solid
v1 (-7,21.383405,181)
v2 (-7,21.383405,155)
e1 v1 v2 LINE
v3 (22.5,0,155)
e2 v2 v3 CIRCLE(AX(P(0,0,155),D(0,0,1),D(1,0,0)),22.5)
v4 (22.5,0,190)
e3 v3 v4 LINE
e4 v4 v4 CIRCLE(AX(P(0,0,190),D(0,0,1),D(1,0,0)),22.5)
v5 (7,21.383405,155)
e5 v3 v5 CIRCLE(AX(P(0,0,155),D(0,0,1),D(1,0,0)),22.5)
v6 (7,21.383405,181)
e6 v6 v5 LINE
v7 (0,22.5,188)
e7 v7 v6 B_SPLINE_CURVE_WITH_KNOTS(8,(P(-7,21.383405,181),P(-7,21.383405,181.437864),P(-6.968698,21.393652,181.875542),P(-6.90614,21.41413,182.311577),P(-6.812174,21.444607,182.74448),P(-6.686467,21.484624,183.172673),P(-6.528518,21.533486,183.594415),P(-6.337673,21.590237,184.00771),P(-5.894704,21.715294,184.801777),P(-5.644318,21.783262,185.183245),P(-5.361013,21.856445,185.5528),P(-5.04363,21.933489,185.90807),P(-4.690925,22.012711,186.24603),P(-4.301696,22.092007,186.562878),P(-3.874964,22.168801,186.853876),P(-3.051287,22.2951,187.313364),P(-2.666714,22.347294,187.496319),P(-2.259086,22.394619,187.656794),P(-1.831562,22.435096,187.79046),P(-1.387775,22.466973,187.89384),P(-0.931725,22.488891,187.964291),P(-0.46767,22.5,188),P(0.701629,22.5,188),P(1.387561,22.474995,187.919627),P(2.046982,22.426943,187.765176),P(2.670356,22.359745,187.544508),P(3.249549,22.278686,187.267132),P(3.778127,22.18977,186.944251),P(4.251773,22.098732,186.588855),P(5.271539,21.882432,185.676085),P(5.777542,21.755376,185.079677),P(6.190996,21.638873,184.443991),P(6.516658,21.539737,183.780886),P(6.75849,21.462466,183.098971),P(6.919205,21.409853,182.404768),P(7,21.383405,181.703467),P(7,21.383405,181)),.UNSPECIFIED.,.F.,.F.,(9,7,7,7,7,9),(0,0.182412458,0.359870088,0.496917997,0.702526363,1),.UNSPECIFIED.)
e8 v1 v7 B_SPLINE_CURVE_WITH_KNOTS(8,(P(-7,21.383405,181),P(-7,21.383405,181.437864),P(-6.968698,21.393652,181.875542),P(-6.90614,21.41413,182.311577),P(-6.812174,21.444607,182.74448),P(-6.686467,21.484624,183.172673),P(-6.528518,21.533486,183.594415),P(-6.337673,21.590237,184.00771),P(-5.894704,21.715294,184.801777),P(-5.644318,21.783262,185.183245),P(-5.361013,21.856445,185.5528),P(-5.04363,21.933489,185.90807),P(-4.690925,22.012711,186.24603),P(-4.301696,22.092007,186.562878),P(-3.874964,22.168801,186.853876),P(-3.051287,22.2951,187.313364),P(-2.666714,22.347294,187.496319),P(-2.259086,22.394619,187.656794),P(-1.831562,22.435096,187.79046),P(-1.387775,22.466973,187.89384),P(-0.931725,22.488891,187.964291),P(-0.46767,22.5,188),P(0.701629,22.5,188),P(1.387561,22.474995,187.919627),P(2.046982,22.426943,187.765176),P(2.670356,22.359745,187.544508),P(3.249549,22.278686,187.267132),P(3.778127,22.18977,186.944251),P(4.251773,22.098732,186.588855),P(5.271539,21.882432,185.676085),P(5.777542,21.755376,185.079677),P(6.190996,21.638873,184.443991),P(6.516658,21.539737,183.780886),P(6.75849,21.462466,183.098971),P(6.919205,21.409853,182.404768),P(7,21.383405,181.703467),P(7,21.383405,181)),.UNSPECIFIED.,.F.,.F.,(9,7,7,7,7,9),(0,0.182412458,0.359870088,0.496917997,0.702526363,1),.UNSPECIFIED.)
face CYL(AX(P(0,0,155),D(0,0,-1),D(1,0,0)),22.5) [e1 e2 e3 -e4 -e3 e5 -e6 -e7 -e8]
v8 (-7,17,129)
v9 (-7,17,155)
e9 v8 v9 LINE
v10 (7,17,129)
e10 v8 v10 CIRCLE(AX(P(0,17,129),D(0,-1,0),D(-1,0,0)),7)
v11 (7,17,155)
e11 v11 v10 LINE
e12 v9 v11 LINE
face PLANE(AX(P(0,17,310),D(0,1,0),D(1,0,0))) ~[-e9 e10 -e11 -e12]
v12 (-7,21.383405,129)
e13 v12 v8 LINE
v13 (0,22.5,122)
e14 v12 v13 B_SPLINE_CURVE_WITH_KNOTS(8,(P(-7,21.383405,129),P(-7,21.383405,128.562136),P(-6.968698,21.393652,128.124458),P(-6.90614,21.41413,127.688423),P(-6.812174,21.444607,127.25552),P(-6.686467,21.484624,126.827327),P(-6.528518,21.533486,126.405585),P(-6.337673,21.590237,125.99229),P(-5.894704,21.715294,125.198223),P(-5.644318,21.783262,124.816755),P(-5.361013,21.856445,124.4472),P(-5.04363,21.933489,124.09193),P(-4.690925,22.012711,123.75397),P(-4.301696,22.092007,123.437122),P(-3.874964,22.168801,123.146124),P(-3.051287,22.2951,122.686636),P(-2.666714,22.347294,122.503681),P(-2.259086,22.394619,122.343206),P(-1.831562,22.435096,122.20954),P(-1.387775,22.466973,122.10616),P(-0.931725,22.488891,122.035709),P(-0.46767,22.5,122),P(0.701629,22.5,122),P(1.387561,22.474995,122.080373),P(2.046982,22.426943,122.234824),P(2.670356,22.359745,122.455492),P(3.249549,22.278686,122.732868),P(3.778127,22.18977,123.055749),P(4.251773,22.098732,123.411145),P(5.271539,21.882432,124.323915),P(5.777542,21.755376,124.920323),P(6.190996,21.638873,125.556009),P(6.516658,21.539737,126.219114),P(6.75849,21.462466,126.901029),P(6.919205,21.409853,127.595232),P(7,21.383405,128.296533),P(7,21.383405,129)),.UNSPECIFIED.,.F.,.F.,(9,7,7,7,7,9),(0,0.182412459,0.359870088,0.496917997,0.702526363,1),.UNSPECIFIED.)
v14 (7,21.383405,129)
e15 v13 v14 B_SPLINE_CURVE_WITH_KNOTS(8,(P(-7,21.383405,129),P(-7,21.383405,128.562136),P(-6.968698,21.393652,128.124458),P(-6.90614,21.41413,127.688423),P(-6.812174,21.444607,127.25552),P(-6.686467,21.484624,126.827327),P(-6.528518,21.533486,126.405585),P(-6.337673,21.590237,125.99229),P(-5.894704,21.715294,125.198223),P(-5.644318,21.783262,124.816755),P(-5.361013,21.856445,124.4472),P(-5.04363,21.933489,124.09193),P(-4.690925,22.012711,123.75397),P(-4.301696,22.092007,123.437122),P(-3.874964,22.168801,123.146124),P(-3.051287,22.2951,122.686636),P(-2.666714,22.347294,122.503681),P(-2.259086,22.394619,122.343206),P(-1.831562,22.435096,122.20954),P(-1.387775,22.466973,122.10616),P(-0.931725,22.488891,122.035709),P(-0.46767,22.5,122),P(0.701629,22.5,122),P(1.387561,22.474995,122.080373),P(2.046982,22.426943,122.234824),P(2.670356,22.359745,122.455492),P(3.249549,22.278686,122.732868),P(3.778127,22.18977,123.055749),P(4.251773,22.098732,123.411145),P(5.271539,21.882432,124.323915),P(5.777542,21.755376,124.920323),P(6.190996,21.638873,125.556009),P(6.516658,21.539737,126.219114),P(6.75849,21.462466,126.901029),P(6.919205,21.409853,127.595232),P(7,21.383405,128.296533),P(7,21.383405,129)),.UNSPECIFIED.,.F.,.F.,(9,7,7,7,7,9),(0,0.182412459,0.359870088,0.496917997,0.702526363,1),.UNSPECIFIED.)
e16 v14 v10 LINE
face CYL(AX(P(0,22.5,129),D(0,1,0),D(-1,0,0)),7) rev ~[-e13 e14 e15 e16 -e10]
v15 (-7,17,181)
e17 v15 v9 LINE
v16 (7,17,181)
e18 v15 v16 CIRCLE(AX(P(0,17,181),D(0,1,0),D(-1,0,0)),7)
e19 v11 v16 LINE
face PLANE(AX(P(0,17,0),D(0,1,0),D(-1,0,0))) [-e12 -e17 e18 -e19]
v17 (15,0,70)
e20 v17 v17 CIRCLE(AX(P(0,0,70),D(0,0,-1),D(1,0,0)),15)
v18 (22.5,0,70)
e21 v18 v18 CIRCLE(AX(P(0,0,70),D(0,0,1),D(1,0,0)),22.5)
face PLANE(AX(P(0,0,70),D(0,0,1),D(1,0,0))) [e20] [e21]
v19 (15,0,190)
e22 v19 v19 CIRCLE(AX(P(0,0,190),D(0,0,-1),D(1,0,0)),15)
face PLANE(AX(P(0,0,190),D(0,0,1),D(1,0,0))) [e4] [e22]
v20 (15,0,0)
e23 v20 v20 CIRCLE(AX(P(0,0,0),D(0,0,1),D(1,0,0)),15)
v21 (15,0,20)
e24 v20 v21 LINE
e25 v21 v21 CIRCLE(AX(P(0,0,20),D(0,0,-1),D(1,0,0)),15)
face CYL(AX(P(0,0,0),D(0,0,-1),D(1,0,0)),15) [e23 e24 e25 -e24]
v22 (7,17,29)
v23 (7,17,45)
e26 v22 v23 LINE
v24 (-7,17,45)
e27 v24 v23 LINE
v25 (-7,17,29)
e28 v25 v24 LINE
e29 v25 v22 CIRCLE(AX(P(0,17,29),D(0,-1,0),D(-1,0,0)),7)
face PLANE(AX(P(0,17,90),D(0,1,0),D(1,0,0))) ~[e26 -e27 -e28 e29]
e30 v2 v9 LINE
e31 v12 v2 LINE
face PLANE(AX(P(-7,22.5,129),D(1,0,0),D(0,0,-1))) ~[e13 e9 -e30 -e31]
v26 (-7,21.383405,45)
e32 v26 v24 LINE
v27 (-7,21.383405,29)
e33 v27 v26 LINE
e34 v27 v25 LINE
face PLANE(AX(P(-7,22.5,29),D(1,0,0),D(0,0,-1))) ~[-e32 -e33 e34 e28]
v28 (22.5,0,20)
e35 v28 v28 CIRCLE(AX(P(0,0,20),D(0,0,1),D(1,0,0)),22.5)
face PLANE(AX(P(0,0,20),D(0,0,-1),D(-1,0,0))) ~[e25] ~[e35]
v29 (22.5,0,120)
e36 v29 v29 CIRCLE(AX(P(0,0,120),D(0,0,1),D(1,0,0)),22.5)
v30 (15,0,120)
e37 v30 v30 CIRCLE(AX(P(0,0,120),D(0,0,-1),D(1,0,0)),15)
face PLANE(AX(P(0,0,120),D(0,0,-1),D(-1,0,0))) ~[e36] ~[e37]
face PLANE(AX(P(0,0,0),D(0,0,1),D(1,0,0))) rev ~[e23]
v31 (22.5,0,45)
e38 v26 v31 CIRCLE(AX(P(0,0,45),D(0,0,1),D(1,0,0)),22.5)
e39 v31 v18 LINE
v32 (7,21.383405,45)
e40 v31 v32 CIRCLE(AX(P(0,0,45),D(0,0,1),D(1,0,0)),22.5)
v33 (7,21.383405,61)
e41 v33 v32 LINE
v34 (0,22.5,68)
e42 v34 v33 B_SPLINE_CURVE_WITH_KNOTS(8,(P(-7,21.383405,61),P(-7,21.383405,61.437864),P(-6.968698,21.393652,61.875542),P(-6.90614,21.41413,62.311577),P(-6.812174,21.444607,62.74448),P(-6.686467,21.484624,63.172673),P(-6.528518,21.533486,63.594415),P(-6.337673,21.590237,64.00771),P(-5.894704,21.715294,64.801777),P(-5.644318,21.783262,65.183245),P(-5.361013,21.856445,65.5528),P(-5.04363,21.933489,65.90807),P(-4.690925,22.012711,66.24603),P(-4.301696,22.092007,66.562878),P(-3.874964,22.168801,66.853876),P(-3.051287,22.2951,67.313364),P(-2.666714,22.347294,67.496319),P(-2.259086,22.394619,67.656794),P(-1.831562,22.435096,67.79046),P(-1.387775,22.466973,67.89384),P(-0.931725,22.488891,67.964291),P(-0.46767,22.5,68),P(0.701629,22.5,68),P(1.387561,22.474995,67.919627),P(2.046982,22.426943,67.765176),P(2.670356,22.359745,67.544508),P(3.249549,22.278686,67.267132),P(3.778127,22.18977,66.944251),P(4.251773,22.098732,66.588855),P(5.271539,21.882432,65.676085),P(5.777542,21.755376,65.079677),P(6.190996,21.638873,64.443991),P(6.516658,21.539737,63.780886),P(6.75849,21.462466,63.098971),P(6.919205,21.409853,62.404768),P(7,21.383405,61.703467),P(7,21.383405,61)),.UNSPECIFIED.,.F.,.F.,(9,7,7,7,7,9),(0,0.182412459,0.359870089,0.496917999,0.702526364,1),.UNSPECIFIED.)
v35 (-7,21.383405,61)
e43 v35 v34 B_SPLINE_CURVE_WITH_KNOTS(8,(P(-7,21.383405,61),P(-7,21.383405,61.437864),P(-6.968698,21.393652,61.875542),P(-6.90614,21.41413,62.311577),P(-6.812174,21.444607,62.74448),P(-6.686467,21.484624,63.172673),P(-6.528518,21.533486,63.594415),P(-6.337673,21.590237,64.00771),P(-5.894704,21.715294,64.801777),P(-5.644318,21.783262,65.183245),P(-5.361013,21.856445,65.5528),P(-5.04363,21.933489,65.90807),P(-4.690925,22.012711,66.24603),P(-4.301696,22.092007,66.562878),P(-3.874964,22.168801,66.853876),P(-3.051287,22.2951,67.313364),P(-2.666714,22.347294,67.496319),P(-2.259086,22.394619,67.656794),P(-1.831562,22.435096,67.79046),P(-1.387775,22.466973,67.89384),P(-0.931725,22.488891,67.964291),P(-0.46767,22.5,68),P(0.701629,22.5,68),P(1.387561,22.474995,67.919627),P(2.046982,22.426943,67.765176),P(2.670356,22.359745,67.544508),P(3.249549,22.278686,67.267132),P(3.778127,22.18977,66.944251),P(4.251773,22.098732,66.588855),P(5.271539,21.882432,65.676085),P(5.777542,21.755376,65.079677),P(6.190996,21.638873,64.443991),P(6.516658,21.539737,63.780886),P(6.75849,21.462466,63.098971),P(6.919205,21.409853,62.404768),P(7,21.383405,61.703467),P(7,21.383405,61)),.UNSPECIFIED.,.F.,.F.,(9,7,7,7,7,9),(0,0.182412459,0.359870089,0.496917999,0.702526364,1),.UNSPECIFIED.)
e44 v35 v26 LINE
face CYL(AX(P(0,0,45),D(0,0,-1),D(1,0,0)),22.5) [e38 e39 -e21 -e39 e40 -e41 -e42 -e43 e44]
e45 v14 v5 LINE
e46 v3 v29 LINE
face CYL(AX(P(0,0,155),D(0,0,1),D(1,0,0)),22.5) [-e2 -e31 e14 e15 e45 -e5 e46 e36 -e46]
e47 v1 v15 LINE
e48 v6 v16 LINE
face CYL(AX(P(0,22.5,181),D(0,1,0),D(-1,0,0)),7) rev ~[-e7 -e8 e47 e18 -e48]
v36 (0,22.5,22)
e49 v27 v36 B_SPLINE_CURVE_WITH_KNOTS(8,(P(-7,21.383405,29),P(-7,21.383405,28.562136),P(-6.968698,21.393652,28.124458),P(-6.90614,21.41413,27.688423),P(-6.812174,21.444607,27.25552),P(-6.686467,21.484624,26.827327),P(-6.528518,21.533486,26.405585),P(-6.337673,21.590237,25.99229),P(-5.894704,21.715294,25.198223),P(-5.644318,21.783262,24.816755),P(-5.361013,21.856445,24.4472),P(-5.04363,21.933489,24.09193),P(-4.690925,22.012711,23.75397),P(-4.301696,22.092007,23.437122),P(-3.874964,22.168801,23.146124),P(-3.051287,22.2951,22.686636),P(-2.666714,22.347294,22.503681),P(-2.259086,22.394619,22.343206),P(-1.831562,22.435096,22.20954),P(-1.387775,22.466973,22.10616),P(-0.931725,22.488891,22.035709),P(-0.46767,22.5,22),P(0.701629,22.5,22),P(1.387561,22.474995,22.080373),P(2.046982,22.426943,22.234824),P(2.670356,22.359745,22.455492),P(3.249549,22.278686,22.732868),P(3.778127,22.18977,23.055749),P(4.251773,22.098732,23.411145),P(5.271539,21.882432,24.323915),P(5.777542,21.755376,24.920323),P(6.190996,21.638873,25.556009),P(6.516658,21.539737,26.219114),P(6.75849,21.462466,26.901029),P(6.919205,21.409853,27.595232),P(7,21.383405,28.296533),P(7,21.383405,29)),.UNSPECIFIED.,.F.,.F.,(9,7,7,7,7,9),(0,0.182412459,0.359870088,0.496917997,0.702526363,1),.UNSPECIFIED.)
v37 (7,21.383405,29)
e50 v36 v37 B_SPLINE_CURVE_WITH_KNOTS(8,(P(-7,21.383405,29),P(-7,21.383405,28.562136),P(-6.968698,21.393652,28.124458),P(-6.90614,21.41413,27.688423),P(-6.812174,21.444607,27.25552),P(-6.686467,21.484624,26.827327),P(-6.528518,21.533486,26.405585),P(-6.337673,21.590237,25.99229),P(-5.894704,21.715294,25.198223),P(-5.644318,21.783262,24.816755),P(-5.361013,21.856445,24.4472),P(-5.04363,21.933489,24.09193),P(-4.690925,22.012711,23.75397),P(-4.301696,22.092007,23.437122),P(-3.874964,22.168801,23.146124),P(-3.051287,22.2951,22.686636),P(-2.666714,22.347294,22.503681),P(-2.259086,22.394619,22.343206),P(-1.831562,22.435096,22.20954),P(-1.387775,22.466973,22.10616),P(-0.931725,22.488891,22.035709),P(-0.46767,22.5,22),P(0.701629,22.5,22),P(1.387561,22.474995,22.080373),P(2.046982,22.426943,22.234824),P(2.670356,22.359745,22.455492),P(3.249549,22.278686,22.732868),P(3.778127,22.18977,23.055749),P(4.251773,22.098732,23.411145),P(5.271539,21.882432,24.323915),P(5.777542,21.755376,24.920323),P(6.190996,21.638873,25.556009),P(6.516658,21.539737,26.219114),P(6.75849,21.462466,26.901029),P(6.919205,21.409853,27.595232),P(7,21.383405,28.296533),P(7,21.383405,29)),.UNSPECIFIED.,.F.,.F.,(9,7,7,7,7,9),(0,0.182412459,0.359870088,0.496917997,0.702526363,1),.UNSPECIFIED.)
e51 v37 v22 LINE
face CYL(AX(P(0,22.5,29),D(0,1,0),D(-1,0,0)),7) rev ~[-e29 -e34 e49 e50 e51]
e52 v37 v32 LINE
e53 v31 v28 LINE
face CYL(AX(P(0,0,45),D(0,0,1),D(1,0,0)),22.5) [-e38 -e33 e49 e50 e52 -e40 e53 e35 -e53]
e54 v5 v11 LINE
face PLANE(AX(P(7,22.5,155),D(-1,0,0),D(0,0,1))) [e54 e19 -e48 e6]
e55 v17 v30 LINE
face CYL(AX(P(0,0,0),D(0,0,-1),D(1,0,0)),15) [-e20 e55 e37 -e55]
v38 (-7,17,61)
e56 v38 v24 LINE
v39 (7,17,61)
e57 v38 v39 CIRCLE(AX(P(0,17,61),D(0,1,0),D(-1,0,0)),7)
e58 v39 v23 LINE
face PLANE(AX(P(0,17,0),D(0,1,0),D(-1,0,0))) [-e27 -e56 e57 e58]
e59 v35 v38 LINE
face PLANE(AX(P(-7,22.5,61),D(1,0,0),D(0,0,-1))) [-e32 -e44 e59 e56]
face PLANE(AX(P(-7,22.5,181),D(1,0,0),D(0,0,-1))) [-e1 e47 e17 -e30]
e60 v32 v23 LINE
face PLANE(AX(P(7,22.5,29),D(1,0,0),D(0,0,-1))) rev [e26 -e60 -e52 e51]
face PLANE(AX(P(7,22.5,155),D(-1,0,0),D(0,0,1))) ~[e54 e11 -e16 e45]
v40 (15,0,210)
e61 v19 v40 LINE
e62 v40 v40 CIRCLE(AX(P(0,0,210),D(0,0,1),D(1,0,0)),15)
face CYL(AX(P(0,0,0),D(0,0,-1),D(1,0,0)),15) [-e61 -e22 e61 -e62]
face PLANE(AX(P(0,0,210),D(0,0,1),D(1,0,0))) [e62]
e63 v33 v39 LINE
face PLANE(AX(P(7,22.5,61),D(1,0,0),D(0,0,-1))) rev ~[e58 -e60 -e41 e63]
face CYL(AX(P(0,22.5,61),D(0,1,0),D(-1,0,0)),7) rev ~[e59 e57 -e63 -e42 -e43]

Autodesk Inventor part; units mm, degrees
ref_plane "YZ Plane" through (0, 0, 0) normal (1, 0, 0) x (0, 1, 0)
sketch "スケッチ1" plane through (0, 0, 0) normal (0, 0, 1) x (1, 0, 0)
  point P0 (0, 0)
ref_plane "作業平面1" through (0, 0, 45) normal (0, 0, 1) x (1, 0, 0)
ref_plane "作業平面2" through (0, 0, 155) normal (0, 0, 1) x (1, 0, 0)
ref_plane "作業平面3" through (0, 0, 210) normal (0, 0, 1) x (1, 0, 0)
sketch "スケッチ2" plane through (0, 0, 45) normal (0, 0, 1) x (1, 0, 0)
  circle A0 centre (0, 0) radius 22.5
  dimension "d3" = 45
extrude "押し出し1" add sketch "スケッチ2" along normal blind 25
sketch "スケッチ3" plane through (0, 0, 155) normal (0, 0, 1) x (1, 0, 0)
  circle A0 centre (0, 0) radius 22.5
  dimension "d6" = 45
extrude "押し出し2" add sketch "スケッチ3" along normal blind 35
ref_plane "作業平面5" through (0, 22.5, 0) normal (0, 1, 0) x (-1, 0, 0)
sketch "スケッチ5" plane through (0, 22.5, 0) normal (0, 1, 0) x (-1, 0, 0)
  line L0 (22.5, 45) -> (-22.5, 45) projected
  line L1 (0, 45) -> (0, 65)
  line L2 (0, 65) -> (0, 61)
  arc A0 (7, 61) -> (-7, 61) centre (0, 61) ccw
  line L3 (7, 61) -> (7, 45)
  line L4 (7, 45) -> (-7, 45)
  line L5 (-7, 61) -> (-7, 45)
  line L6 (7, 45) -> (-7, 45)
  point P0 (0, 0)
  point P1 (-4, 61)
  dimension "d11" = 20
  dimension "d12" = 4
  dimension "d13" = 7
extrude "押し出し3" cut sketch "スケッチ5" against normal blind 5.5
mirror "ミラー1" about plane through (0, 0, 45) normal (0, 0, 1) of "押し出し1", "押し出し3"
sketch "スケッチ6" plane through (0, 22.5, 0) normal (0, 1, 0) x (-1, 0, 0)
  line L0 (22.5, 155) -> (-22.5, 155) projected
  line L1 (0, 155) -> (0, 185)
  line L2 (0, 185) -> (0, 181)
  arc A0 (7, 181) -> (-7, 181) centre (0, 181) ccw
  line L3 (7, 181) -> (7, 155)
  line L4 (-7, 155) -> (-7, 181)
  line L5 (7, 155) -> (-7, 155)
  point P0 (0, 0)
  dimension "d16" = 30
  dimension "d17" = 4
  dimension "d18" = 7
extrude "押し出し4" cut sketch "スケッチ6" against normal blind 5.5
mirror "ミラー2" about plane through (0, 0, 155) normal (0, 0, -1) of "押し出し4", "押し出し2"
sketch "スケッチ7" plane through (0, 0, 0) normal (0, 0, 1) x (1, 0, 0)
  circle A0 centre (0, 0) radius 15
  dimension "d21" = 30
extrude "押し出し5" add sketch "スケッチ7" along normal blind 210
properties part number "shift2"
